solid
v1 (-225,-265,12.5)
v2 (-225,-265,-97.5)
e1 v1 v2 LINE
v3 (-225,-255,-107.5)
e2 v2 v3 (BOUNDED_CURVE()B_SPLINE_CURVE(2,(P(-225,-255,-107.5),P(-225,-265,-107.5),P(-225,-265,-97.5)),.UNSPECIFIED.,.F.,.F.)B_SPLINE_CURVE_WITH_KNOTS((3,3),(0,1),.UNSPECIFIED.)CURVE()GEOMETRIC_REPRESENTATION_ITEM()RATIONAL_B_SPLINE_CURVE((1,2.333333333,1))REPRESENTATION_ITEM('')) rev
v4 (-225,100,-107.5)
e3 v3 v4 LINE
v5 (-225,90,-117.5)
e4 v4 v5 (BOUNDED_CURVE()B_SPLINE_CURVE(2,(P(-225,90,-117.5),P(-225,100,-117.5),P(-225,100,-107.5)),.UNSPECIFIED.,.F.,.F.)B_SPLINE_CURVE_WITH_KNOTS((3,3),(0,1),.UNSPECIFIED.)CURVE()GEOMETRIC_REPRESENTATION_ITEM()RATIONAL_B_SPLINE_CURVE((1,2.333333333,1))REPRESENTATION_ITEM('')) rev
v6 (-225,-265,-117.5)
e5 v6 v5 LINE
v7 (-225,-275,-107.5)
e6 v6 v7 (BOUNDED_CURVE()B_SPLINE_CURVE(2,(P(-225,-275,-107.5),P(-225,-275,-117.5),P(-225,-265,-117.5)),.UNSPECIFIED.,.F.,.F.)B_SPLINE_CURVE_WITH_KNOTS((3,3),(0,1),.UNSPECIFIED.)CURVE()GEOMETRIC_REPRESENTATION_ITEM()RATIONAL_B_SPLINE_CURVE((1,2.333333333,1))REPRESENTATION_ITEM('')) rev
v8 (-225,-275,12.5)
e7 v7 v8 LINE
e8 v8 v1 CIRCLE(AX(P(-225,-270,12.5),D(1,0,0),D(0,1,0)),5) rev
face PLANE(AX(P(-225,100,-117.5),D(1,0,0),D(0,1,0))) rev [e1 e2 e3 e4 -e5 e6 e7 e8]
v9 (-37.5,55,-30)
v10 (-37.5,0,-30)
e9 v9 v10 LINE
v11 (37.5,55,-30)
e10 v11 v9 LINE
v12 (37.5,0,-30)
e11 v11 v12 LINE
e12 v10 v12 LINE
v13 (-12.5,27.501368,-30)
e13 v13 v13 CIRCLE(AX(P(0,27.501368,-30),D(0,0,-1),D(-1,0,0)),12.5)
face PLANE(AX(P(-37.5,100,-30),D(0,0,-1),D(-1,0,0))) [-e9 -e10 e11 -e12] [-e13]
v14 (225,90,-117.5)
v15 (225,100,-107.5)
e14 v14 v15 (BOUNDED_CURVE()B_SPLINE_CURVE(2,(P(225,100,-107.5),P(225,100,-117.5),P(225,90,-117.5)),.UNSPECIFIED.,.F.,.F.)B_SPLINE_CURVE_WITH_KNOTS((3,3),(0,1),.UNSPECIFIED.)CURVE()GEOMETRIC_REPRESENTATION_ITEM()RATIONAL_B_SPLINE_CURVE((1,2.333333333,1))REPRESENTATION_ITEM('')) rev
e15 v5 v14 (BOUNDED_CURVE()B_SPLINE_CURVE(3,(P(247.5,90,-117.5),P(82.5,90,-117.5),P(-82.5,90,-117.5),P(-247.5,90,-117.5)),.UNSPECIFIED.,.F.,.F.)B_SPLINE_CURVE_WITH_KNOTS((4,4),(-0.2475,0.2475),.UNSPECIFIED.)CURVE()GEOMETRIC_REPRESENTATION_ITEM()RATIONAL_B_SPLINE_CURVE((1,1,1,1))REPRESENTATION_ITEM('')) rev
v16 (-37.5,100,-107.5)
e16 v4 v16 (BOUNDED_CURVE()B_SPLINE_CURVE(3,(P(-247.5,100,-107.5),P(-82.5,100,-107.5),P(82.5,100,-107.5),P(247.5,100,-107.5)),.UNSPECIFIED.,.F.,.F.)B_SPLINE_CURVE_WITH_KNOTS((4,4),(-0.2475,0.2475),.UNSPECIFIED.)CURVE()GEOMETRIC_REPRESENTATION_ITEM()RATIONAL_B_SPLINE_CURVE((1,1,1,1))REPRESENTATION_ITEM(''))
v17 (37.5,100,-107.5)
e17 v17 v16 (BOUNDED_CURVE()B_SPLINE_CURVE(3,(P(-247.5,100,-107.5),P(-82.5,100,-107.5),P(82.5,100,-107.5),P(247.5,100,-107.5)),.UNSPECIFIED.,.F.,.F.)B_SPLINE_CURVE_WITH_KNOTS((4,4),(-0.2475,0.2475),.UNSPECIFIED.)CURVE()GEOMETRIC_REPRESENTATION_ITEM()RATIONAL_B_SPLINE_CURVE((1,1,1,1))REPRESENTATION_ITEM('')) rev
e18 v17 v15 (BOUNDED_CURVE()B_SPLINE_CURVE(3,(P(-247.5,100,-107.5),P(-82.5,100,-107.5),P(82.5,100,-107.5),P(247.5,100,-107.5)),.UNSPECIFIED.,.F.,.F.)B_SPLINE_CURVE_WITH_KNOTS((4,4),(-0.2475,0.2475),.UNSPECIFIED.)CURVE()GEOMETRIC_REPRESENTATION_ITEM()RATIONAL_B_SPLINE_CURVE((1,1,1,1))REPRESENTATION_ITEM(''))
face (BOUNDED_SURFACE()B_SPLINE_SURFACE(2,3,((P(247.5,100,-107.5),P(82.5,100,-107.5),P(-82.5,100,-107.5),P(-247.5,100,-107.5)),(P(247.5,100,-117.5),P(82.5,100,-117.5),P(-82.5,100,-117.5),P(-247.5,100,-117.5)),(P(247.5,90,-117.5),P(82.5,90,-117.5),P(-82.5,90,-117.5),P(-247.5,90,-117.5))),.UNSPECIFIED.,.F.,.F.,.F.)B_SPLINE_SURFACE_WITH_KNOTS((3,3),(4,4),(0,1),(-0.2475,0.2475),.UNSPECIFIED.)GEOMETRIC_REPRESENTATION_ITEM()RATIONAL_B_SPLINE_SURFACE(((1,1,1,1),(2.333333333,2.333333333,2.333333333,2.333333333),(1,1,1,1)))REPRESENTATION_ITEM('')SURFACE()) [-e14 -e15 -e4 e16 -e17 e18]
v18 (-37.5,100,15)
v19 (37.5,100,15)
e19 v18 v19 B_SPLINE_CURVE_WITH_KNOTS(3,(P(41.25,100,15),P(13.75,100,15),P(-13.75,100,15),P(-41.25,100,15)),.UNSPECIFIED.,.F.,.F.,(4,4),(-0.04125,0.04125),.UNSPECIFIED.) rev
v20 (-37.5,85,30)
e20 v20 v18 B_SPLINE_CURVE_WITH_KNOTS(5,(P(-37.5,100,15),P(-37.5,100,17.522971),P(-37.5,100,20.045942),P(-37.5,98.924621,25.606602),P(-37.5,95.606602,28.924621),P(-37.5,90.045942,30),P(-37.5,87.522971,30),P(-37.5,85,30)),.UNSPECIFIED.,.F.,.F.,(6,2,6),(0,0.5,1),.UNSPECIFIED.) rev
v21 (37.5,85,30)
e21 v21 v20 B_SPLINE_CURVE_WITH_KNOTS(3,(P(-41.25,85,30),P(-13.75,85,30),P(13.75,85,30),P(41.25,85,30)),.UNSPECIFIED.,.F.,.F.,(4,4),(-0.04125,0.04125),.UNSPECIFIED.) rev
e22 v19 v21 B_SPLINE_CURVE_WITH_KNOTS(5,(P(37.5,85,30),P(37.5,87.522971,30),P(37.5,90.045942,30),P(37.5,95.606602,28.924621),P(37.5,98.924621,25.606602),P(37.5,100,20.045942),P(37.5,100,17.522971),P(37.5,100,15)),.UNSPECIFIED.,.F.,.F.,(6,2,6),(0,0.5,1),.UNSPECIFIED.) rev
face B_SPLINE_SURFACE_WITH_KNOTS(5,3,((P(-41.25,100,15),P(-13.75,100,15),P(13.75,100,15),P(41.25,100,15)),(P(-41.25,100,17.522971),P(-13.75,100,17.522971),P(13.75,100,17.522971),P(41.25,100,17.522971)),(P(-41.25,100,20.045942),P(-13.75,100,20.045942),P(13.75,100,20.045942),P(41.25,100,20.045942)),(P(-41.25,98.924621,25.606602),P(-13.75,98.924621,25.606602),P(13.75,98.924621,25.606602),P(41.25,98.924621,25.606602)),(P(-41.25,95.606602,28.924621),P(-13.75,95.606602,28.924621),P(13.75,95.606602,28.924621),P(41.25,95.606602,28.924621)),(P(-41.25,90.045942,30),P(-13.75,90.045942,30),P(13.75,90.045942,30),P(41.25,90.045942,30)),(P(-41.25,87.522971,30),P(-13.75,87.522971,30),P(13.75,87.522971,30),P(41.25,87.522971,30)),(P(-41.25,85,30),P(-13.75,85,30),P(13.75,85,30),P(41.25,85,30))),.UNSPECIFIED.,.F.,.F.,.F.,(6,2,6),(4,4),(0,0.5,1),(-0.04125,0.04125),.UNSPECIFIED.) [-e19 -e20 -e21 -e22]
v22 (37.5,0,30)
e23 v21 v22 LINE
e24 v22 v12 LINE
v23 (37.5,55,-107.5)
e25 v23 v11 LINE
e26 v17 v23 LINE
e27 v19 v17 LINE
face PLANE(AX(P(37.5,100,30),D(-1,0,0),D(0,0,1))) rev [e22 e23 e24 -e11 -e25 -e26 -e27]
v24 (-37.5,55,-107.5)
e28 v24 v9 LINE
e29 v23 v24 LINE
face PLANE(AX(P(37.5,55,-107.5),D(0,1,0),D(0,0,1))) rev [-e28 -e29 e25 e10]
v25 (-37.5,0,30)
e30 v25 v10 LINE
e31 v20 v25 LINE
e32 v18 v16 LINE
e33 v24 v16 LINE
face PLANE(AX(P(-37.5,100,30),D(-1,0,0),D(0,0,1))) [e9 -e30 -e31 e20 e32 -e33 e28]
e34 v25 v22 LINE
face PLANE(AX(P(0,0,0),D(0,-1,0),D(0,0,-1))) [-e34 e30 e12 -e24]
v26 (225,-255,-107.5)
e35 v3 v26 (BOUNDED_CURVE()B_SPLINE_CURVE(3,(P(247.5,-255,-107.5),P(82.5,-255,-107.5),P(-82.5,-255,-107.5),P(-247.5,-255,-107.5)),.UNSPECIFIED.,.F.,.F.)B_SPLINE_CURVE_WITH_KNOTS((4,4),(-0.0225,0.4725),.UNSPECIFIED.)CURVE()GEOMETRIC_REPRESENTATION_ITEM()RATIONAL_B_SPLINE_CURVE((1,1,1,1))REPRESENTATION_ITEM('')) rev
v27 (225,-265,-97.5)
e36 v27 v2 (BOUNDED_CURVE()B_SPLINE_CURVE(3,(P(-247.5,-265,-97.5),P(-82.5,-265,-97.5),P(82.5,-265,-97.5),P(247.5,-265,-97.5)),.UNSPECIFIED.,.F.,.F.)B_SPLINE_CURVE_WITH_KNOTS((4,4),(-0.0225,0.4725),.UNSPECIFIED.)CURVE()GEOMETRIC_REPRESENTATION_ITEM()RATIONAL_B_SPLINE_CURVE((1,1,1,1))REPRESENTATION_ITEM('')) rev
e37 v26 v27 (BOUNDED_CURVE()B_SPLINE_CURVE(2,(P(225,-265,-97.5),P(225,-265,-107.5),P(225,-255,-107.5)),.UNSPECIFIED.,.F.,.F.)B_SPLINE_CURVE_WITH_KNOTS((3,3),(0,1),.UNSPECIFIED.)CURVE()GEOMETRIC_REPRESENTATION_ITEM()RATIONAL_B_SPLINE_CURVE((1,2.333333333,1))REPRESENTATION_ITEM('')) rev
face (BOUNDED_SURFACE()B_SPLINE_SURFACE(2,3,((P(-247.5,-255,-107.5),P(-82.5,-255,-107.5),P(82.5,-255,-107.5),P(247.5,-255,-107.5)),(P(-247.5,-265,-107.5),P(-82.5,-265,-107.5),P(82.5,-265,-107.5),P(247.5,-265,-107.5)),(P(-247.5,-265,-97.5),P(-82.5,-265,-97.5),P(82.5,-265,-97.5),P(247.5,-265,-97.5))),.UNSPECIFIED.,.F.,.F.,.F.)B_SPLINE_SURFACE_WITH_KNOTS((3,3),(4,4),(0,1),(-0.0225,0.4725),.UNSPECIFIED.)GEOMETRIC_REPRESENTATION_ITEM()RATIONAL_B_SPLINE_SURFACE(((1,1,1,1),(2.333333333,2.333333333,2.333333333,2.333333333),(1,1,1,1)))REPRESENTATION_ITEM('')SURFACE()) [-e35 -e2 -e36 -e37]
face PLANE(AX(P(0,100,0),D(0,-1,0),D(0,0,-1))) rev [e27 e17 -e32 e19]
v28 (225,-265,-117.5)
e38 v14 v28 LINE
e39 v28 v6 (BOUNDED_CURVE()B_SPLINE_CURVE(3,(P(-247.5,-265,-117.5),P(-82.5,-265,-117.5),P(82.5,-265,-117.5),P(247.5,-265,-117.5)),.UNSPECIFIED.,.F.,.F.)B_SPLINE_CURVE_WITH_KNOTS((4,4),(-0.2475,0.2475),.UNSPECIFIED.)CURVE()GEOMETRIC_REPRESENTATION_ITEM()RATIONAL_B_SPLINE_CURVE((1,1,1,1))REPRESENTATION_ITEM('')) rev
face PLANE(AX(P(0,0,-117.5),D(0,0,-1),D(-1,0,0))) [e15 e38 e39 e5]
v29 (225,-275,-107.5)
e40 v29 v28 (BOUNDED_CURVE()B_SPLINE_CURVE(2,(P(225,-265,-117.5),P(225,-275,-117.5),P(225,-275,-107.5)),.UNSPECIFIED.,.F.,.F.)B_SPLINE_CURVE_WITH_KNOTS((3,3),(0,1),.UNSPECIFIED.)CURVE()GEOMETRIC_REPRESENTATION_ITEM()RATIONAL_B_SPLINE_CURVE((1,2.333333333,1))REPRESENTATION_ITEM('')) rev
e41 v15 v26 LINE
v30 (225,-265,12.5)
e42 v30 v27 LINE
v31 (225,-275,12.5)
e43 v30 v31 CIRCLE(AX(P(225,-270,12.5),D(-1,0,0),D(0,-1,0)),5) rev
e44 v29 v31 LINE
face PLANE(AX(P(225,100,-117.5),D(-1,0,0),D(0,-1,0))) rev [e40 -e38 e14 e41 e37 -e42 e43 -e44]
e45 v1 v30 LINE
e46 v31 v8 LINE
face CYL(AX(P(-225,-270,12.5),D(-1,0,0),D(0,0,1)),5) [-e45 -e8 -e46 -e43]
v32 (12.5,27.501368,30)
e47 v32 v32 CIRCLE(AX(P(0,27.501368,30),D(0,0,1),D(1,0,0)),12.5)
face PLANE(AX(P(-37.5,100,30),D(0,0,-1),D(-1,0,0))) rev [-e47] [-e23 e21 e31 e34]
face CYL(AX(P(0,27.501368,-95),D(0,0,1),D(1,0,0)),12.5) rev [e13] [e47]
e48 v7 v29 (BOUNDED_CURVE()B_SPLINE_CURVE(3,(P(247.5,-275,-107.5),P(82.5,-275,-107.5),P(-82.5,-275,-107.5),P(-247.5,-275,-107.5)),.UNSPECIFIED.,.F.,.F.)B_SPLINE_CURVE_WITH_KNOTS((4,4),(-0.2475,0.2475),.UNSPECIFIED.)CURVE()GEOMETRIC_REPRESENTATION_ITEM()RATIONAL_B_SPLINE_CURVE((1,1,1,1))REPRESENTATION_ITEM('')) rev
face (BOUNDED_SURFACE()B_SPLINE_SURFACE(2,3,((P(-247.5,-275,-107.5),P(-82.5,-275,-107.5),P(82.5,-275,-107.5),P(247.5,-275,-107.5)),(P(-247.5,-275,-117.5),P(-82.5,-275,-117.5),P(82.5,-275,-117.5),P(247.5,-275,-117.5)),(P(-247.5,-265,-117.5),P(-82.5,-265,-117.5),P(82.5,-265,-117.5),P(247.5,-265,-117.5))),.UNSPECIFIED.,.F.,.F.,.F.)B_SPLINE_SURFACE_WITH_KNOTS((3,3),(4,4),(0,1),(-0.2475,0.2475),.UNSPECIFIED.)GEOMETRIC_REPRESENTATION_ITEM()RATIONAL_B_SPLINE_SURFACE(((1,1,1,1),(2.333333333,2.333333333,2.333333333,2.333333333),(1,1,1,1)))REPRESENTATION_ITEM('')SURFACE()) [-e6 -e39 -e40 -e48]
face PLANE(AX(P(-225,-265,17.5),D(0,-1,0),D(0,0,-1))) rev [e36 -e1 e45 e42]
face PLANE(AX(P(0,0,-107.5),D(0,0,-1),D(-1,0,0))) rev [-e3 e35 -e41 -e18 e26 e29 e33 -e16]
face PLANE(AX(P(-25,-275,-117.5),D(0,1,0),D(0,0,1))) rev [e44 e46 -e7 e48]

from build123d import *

# Parameters (mm, degrees)
SKETCH1_W           = 75
SKETCH1_H           = 60
BOSS_EXTRUDE2_DEPTH = 100
SKETCH2_W           = 75
SKETCH2_H           = 45
BOSS_EXTRUDE3_DEPTH = 77.5
BOSS_EXTRUDE4_DEPTH = 10
SKETCH4_W           = 450
SKETCH4_H           = 10
BOSS_EXTRUDE5_DEPTH = 125
SKETCH5_R           = 12.5
CUT_EXTRUDE1_DEPTH  = 125
FILLET3_SIZE        = 10
FILLET4_RADIUS      = 5
FILLET4_LENGTH      = 450
FILLET5_SIZE        = 10
FILLET6_SIZE        = 15


with BuildPart() as part:
    # Sketch1 → Boss-Extrude2 (new body)
    with BuildSketch(Plane(origin=(0, 0, 0), x_dir=(1, 0, 0), z_dir=(0, 1, 0))):
        Rectangle(SKETCH1_W, SKETCH1_H)
    extrude(amount=BOSS_EXTRUDE2_DEPTH)

    # Sketch2 → Boss-Extrude3 (add)
    with BuildSketch(Plane(origin=(0, 0, -30), x_dir=(-1, 0, 0), z_dir=(0, 0, -1))):
        with Locations((0, 77.5)):
            Rectangle(SKETCH2_W, SKETCH2_H)
    extrude(amount=BOSS_EXTRUDE3_DEPTH)

    # Sketch3 → Boss-Extrude4 (add)
    with BuildSketch(Plane(origin=(0, 0, -107.5), x_dir=(-1, 0, 0), z_dir=(0, 0, -1))):
        Polygon((0, 100), (225, 100), (225, -275), (25, -275), (-225, -275), (-225, 100), align=None)
    extrude(amount=BOSS_EXTRUDE4_DEPTH)

    # Sketch4 → Boss-Extrude5 (add)
    with BuildSketch(Plane.XY.offset(-107.5)):
        with Locations((0, -270)):
            Rectangle(SKETCH4_W, SKETCH4_H)
    extrude(amount=BOSS_EXTRUDE5_DEPTH)

    # Sketch5 → Cut-Extrude1 (cut)
    with BuildSketch(Plane.XY.offset(30)):
        with Locations((0, 27.501368098)):
            Circle(SKETCH5_R)
    extrude(amount=-CUT_EXTRUDE1_DEPTH, mode=Mode.SUBTRACT)

    # Fillet3
    # a fillet whose section is not a circle: 10 mm, written as the material it takes off along each edge
    with BuildSketch(Plane(origin=(-250, -275, -117.5), x_dir=(0, 1, 0), z_dir=(1, 0, 0))) as fillet3_piece_1:
        with BuildLine():
            Bezier((FILLET3_SIZE, 0), (0, 0), (0, FILLET3_SIZE), weights=[1, 2.333333333, 1])
            Line((0, FILLET3_SIZE), (0, 0))
            Line((0, 0), (FILLET3_SIZE, 0))
        make_face()
    extrude(amount=500, mode=Mode.SUBTRACT)
    with BuildSketch(Plane(origin=(250, 100, -117.5), x_dir=(0, 0, 1), z_dir=(-1, 0, 0))) as fillet3_piece_2:
        with BuildLine():
            Bezier((FILLET3_SIZE, 0), (0, 0), (0, -FILLET3_SIZE), weights=[1, 2.333333333, 1])
            Line((0, -FILLET3_SIZE), (0, 0))
            Line((0, 0), (FILLET3_SIZE, 0))
        make_face()
    extrude(amount=500, mode=Mode.SUBTRACT)

    # Fillet4: full round fillet: the end face becomes a half cylinder, R = half its width
    fillet4_face = Plane((0, -270, 17.5), x_dir=(1, 0, 0), z_dir=(0, 0, 1))  # on the end face: x along it, z out of the body
    fillet4_slab = fillet4_face.offset(-FILLET4_RADIUS / 2) * Box(FILLET4_LENGTH, 2 * FILLET4_RADIUS, FILLET4_RADIUS, mode=Mode.PRIVATE)  # the body's end, R deep
    fillet4_round = Plane((0, -270, 12.5), x_dir=(0, 0, 1), z_dir=(1, 0, 0)) * Cylinder(FILLET4_RADIUS, FILLET4_LENGTH, mode=Mode.PRIVATE)  # its axis R under the face
    add(fillet4_slab - fillet4_round, mode=Mode.SUBTRACT)

    # Fillet5
    # a fillet whose section is not a circle: 10 mm, written as the material it adds along each edge
    with BuildSketch(Plane(origin=(225, -265, -107.5), x_dir=(0, 1, 0), z_dir=(-1, 0, 0))) as fillet5_piece_1:
        with BuildLine():
            Bezier((FILLET5_SIZE, 0), (0, 0), (0, -FILLET5_SIZE), weights=[1, 2.333333333, 1])
            Line((0, -FILLET5_SIZE), (-FILLET5_SIZE * 0.02, -FILLET5_SIZE))
            Line((-FILLET5_SIZE * 0.02, -FILLET5_SIZE), (-FILLET5_SIZE * 0.02, FILLET5_SIZE * 0.02))
            Line((-FILLET5_SIZE * 0.02, FILLET5_SIZE * 0.02), (FILLET5_SIZE, FILLET5_SIZE * 0.02))
            Line((FILLET5_SIZE, FILLET5_SIZE * 0.02), (FILLET5_SIZE, 0))
        make_face()
    extrude(amount=450)

    # Fillet6
    # a fillet whose section is not a circle: 15 mm, written as the material it takes off along each edge
    with BuildSketch(Plane(origin=(-75, 100, 30), x_dir=(0, 0, -1), z_dir=(1, 0, 0))) as fillet6_piece_1:
        with BuildLine():
            add(Edge.make_bspline([(FILLET6_SIZE, 0), (FILLET6_SIZE * 0.831801948466, 0), (FILLET6_SIZE * 0.663603896932, 0), (FILLET6_SIZE * 0.292893218813, -FILLET6_SIZE * 0.0716919198361), (FILLET6_SIZE * 0.0716919198361, -FILLET6_SIZE * 0.292893218813), (0, -FILLET6_SIZE * 0.663603896932), (0, -FILLET6_SIZE * 0.831801948466), (0, -FILLET6_SIZE)], knots=[0, 0, 0, 0, 0, 0, 0.5, 0.5, 1, 1, 1, 1, 1, 1], degree=5))
            Line((0, -FILLET6_SIZE), (0, 0))
            Line((0, 0), (FILLET6_SIZE, 0))
        make_face()
    extrude(amount=150, mode=Mode.SUBTRACT)


solid = part.part
